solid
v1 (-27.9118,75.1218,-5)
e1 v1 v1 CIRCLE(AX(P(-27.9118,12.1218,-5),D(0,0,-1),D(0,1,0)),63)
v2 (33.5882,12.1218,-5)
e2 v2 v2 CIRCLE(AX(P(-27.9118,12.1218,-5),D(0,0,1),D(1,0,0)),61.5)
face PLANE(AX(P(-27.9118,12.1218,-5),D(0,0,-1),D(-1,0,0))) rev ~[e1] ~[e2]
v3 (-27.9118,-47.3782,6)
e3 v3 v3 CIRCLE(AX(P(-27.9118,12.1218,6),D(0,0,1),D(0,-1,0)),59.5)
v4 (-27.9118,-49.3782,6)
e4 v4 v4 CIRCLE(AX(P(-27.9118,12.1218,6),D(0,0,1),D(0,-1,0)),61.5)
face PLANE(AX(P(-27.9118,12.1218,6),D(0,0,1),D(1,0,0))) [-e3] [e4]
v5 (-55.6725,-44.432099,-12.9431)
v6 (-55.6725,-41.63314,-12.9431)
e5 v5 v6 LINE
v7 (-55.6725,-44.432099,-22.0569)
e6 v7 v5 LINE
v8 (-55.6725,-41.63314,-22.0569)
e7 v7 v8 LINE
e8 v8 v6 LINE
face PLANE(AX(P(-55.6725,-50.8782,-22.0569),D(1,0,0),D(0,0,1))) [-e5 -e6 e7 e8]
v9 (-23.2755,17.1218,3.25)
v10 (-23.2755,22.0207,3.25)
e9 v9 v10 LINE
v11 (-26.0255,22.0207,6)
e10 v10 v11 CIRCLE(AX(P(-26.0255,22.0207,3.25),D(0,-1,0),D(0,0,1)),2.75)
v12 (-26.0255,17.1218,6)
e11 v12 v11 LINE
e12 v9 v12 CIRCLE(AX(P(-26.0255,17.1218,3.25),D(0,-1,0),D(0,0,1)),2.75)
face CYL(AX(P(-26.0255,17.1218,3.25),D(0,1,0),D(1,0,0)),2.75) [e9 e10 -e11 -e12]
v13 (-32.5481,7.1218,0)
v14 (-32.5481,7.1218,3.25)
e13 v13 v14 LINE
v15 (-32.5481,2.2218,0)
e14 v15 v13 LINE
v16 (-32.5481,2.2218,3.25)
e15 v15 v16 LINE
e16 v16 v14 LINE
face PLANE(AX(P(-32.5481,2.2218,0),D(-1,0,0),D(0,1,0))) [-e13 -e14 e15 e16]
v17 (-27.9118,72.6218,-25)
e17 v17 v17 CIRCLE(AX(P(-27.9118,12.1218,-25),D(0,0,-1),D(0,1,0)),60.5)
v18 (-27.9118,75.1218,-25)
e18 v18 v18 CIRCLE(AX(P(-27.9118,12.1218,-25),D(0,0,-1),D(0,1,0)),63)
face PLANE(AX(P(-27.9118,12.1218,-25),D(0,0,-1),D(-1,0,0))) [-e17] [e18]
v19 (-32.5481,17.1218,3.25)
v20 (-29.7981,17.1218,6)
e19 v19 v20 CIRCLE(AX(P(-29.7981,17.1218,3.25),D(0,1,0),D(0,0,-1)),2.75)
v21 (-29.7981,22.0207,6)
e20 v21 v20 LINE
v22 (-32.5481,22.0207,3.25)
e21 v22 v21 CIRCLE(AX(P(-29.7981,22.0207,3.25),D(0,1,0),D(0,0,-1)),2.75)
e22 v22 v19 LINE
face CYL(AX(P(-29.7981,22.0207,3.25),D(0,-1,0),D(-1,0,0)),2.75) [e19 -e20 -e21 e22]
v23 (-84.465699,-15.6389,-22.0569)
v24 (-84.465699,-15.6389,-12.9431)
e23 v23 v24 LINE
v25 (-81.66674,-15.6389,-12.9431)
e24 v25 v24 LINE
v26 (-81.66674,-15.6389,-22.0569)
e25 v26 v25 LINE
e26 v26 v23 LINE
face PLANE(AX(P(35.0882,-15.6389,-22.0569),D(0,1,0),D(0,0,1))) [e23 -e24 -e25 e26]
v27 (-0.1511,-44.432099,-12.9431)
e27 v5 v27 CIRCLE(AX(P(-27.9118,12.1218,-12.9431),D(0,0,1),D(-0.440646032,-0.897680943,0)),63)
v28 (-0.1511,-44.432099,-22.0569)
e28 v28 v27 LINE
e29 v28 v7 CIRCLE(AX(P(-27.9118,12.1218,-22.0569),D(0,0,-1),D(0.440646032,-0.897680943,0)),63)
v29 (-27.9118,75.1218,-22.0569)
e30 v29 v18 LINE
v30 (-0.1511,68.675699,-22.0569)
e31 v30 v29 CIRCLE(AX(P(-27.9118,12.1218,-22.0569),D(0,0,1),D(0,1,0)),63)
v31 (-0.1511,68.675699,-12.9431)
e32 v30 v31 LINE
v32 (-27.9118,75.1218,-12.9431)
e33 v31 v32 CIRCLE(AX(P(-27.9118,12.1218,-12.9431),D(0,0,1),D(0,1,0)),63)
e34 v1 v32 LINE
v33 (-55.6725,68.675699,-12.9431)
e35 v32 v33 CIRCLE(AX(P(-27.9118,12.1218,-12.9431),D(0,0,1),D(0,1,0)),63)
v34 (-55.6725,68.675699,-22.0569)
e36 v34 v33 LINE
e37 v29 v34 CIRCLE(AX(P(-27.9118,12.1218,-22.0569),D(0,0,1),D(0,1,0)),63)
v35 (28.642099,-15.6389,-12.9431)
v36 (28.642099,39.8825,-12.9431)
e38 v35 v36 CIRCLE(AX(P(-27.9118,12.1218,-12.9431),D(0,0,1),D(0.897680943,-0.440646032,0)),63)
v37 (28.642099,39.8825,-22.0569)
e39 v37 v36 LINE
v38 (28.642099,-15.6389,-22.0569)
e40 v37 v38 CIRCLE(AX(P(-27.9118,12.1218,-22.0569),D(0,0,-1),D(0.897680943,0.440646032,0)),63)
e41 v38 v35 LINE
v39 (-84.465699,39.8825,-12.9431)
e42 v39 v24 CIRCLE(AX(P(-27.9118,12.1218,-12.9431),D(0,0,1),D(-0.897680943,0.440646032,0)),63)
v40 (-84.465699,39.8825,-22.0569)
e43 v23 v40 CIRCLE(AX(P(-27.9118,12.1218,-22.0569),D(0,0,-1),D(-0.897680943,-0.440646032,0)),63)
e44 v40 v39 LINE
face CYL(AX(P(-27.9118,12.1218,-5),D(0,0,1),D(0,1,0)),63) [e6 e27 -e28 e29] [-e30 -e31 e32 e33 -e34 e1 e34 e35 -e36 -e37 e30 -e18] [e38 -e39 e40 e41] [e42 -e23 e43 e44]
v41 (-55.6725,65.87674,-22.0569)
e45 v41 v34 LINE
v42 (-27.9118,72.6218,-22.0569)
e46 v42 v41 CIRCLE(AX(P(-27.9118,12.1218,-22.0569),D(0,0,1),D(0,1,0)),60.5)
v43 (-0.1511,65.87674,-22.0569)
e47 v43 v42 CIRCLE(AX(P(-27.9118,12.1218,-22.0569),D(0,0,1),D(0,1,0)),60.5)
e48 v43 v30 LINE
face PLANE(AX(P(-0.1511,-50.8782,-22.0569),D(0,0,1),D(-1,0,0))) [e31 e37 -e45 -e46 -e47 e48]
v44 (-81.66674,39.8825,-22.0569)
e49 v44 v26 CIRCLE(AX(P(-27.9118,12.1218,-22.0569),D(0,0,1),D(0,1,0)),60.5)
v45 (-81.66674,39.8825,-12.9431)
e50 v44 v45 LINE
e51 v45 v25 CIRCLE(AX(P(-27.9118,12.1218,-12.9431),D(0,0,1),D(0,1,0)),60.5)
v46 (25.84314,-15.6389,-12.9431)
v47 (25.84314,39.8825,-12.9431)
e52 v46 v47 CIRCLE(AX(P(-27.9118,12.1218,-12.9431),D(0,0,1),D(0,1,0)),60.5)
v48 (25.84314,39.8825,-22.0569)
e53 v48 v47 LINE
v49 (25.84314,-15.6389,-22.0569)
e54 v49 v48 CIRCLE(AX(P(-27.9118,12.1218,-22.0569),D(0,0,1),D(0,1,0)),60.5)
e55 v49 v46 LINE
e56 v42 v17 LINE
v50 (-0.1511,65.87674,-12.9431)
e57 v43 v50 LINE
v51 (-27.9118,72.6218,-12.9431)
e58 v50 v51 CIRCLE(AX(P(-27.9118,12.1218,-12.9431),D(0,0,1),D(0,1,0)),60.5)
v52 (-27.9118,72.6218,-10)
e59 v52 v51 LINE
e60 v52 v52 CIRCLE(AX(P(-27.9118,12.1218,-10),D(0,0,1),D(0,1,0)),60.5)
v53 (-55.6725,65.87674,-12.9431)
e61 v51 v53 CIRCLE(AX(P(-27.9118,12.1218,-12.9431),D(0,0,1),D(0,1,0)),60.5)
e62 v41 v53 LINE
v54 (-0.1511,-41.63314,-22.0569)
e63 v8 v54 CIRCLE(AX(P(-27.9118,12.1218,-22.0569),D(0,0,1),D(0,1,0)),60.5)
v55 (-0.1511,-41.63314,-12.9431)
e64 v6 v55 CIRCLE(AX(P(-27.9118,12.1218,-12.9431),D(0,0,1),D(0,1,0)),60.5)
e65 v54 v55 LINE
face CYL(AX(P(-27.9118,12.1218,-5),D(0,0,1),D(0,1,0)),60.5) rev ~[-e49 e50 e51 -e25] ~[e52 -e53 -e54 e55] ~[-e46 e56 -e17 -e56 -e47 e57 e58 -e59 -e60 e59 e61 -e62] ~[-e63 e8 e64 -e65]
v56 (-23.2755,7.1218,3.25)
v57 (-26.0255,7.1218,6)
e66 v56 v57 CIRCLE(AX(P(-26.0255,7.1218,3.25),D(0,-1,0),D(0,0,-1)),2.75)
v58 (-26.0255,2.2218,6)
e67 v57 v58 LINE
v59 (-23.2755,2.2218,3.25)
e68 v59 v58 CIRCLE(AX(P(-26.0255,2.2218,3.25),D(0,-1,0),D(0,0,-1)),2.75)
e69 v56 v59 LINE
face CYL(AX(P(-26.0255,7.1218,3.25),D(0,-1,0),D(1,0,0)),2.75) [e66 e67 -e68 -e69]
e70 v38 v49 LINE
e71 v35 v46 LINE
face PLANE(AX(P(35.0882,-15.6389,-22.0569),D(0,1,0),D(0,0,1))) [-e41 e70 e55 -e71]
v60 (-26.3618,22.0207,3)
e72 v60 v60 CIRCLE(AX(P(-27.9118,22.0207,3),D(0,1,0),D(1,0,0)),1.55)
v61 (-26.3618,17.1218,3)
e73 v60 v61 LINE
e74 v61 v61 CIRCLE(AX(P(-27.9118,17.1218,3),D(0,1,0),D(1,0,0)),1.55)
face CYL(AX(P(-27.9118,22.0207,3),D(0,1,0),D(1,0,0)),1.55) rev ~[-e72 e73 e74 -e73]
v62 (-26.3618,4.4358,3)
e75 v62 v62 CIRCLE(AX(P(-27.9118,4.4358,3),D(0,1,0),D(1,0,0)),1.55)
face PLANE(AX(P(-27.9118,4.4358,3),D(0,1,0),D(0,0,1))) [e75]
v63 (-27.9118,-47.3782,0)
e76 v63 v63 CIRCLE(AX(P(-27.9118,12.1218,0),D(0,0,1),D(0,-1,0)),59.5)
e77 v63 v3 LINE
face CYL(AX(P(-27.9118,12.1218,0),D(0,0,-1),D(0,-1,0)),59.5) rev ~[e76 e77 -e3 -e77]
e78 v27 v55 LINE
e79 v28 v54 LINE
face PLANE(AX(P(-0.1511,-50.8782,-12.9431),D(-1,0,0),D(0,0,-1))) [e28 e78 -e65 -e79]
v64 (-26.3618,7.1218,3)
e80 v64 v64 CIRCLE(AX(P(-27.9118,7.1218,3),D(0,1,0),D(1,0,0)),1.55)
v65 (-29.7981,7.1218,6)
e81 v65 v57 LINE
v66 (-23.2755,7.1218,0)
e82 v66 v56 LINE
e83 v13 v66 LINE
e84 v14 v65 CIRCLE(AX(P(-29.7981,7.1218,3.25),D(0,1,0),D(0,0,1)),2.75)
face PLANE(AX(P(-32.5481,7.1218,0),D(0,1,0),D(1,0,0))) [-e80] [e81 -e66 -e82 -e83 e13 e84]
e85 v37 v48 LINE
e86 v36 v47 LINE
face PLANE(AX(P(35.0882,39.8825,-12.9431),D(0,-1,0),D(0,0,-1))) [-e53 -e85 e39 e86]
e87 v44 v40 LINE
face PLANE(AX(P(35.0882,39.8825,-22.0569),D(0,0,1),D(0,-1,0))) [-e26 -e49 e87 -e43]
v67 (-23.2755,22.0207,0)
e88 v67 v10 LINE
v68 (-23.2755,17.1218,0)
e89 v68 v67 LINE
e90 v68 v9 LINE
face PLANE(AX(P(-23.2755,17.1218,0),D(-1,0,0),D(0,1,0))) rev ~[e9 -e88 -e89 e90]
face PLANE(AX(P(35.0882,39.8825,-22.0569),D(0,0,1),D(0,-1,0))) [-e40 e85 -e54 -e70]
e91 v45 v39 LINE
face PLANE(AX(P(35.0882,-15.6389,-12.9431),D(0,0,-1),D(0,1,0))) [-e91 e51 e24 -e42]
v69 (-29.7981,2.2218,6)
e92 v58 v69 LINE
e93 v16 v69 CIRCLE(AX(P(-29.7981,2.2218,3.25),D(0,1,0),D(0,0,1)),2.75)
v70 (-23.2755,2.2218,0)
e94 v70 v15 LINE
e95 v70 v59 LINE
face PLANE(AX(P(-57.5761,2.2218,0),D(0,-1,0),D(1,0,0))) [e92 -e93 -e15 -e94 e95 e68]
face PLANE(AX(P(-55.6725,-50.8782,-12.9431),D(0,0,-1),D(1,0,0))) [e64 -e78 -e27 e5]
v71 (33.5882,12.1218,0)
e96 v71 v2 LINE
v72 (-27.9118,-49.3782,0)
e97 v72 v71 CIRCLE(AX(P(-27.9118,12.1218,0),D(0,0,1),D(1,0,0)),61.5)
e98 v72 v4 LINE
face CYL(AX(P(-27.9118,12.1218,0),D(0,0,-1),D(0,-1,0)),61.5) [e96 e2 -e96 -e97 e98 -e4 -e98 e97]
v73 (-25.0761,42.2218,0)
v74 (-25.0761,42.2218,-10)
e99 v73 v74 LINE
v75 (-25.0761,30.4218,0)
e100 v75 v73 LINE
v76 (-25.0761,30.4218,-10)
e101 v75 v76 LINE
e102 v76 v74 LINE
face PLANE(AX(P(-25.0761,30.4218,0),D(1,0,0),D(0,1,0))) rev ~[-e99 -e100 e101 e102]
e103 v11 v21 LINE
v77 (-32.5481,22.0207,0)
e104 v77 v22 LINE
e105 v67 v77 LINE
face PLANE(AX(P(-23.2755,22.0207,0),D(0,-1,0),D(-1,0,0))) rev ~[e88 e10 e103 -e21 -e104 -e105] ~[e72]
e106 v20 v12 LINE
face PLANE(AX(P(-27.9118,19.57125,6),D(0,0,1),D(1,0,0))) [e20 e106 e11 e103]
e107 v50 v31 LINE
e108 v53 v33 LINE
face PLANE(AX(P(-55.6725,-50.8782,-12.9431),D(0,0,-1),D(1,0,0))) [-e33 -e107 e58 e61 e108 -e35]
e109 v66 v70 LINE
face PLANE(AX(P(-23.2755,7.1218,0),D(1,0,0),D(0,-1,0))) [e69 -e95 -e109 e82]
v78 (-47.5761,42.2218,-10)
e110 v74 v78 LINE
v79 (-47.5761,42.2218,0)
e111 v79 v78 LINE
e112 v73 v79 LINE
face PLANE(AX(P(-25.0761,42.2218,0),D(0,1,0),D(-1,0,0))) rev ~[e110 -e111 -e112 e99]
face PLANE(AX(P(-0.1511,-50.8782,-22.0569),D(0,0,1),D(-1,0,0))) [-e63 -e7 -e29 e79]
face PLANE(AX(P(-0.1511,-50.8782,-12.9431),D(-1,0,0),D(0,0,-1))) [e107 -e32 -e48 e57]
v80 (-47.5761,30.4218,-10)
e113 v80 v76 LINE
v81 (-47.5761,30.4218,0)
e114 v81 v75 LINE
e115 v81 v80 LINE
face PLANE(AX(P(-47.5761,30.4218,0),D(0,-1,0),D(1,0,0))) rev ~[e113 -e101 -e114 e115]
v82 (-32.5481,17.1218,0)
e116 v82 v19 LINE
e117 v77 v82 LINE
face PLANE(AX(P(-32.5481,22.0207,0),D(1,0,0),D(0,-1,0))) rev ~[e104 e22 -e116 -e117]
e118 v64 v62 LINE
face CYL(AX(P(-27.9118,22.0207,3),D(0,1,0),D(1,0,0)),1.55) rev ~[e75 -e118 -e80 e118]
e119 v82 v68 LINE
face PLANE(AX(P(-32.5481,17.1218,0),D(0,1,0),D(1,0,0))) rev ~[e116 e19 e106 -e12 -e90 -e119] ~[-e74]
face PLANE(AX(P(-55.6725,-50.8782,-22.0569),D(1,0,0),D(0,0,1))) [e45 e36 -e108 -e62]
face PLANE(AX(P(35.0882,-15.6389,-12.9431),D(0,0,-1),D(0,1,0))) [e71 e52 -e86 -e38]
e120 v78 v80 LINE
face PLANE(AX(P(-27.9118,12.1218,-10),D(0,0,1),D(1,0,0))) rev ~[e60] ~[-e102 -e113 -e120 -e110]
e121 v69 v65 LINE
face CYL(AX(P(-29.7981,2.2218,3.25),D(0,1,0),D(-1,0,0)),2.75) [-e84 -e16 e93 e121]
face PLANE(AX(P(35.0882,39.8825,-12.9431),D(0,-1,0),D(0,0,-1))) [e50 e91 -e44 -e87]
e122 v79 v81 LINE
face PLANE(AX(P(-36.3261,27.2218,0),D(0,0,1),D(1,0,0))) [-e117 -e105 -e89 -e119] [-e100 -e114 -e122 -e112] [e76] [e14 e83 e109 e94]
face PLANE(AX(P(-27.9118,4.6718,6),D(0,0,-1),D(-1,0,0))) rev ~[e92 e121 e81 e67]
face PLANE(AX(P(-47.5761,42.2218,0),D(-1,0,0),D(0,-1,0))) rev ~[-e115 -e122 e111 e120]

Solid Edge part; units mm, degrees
sketch "Sketch1" plane through (0, 0, 0) normal (0, 0, 1) x (1, 0, 0)
  line L0 (-15.0761, 2.2218) -> (-15.0761, 52.2218)
  line L1 (-15.0761, 52.2218) -> (-57.5761, 52.2218)
  line L2 (-57.5761, 52.2218) -> (-57.5761, 2.2218)
  line L3 (-57.5761, 2.2218) -> (-15.0761, 2.2218)
  line L4 (-25.0761, 30.4218) -> (-25.0761, 42.2218)
  line L5 (-25.0761, 42.2218) -> (-47.5761, 42.2218)
  line L6 (-47.5761, 42.2218) -> (-47.5761, 30.4218)
  line L7 (-47.5761, 30.4218) -> (-25.0761, 30.4218)
  dimension "D1" = 22.5
  dimension "D2" = 11.8
  dimension "D3" = 50
  dimension "D4" = 42.5
  dimension "D5" = 4.8989
  dimension "D6" = 4.9
  dimension "D7" = 10
  dimension "D8" = 10
  dimension "D9" = 10
extrude "Protrusion1" add sketch "Sketch1" against normal blind 10
sketch "Sketch2" plane through (0, 0, 0) normal (0, 0, 1) x (1, 0, 0)
  line L0 (-23.2755, 17.1218) -> (-23.2755, 22.0207)
  line L1 (-23.2755, 22.0207) -> (-32.5481, 22.0207)
  line L2 (-32.5481, 22.0207) -> (-32.5481, 17.1218)
  line L3 (-32.5481, 17.1218) -> (-23.2755, 17.1218)
  line L4 (-23.2755, 7.1218) -> (-23.2755, 2.2218)
  line L5 (-23.2755, 2.2218) -> (-32.5481, 2.2218)
  line L6 (-32.5481, 2.2218) -> (-32.5481, 7.1218)
  line L7 (-32.5481, 7.1218) -> (-23.2755, 7.1218)
  dimension "D1" = 22.5
  dimension "D2" = 11.8
  dimension "D3" = 50
  dimension "D4" = 42.5
  dimension "D5" = 4.8989
  dimension "D6" = 4.9
  dimension "D7" = 10
  dimension "D8" = 10
  dimension "D9" = 10
extrude "ExtrudedProtrusion_3" add sketch "Sketch2" along normal blind 6
sketch "Sketch3" plane through (-27.9118, 22.0207, 3) normal (0, 1, 0) x (1, 0, 0)
  circle A0 centre (0, 0) radius 1.55
extrude "ExtrudedCutout_1" cut sketch "Sketch3" against normal blind 17.5849
sketch "Sketch4" plane through (0, 0, 0) normal (0, 0, 1) x (1, 0, 0)
  circle A0 centre (-27.9118, 12.1218) radius 61.5
extrude "ExtrudedProtrusion_4" add sketch "Sketch4" against normal blind 10
sketch "Sketch5" plane through (0, 0, 0) normal (0, 0, 1) x (1, 0, 0)
  line L0 (-47.5761, 42.2218) -> (-47.5761, 30.4218)
  line L1 (-47.5761, 30.4218) -> (-25.0761, 30.4218)
  line L2 (-25.0761, 30.4218) -> (-25.0761, 42.2218)
  line L3 (-25.0761, 42.2218) -> (-47.5761, 42.2218)
extrude "ExtrudedCutout_2" cut sketch "Sketch5" against normal blind 44.8908
sketch "Sketch6" plane through (-27.9118, 12.1218, -5) normal (0, 0, -1) x (0, 1, 0)
  circle A0 centre (0, 0) radius 60.5
  circle A1 centre (0, 0) radius 63
extrude "ExtrudedProtrusion_6" add sketch "Sketch6" along normal blind 20
sketch "Sketch7" plane through (-27.9118, -50.8782, -15) normal (0, -1, 0) x (0, 0, 1)
  line L0 (-7.0569, 27.7607) -> (2.0569, 27.7607)
  line L1 (2.0569, 27.7607) -> (2.0569, -27.7607)
  line L2 (2.0569, -27.7607) -> (-7.0569, -27.7607)
  line L3 (-7.0569, -27.7607) -> (-7.0569, 27.7607)
extrude "ExtrudedCutout_3" cut sketch "Sketch7" against normal blind 172.1374
pattern_circular "Pattern_1" count 4 over 360 about axis through (-27.9118, 12.1218, -25) along (0, 0, 1) of "ExtrudedCutout_3"
sketch "Sketch8" plane through (-27.9118, 12.1218, 0) normal (0, 0, 1) x (0, -1, 0)
  circle A0 centre (0, 0) radius 59.5
  circle A1 centre (0, 0) radius 61.5
extrude "Protrusion2" add sketch "Sketch8" along normal blind 6
fillet "Round_1" radius 2.75 4 edges at (-32.5481, 4.6718, 6) (-23.2755, 4.6718, 6) (-32.5481, 19.5713, 6) (-23.2755, 19.5713, 6)
